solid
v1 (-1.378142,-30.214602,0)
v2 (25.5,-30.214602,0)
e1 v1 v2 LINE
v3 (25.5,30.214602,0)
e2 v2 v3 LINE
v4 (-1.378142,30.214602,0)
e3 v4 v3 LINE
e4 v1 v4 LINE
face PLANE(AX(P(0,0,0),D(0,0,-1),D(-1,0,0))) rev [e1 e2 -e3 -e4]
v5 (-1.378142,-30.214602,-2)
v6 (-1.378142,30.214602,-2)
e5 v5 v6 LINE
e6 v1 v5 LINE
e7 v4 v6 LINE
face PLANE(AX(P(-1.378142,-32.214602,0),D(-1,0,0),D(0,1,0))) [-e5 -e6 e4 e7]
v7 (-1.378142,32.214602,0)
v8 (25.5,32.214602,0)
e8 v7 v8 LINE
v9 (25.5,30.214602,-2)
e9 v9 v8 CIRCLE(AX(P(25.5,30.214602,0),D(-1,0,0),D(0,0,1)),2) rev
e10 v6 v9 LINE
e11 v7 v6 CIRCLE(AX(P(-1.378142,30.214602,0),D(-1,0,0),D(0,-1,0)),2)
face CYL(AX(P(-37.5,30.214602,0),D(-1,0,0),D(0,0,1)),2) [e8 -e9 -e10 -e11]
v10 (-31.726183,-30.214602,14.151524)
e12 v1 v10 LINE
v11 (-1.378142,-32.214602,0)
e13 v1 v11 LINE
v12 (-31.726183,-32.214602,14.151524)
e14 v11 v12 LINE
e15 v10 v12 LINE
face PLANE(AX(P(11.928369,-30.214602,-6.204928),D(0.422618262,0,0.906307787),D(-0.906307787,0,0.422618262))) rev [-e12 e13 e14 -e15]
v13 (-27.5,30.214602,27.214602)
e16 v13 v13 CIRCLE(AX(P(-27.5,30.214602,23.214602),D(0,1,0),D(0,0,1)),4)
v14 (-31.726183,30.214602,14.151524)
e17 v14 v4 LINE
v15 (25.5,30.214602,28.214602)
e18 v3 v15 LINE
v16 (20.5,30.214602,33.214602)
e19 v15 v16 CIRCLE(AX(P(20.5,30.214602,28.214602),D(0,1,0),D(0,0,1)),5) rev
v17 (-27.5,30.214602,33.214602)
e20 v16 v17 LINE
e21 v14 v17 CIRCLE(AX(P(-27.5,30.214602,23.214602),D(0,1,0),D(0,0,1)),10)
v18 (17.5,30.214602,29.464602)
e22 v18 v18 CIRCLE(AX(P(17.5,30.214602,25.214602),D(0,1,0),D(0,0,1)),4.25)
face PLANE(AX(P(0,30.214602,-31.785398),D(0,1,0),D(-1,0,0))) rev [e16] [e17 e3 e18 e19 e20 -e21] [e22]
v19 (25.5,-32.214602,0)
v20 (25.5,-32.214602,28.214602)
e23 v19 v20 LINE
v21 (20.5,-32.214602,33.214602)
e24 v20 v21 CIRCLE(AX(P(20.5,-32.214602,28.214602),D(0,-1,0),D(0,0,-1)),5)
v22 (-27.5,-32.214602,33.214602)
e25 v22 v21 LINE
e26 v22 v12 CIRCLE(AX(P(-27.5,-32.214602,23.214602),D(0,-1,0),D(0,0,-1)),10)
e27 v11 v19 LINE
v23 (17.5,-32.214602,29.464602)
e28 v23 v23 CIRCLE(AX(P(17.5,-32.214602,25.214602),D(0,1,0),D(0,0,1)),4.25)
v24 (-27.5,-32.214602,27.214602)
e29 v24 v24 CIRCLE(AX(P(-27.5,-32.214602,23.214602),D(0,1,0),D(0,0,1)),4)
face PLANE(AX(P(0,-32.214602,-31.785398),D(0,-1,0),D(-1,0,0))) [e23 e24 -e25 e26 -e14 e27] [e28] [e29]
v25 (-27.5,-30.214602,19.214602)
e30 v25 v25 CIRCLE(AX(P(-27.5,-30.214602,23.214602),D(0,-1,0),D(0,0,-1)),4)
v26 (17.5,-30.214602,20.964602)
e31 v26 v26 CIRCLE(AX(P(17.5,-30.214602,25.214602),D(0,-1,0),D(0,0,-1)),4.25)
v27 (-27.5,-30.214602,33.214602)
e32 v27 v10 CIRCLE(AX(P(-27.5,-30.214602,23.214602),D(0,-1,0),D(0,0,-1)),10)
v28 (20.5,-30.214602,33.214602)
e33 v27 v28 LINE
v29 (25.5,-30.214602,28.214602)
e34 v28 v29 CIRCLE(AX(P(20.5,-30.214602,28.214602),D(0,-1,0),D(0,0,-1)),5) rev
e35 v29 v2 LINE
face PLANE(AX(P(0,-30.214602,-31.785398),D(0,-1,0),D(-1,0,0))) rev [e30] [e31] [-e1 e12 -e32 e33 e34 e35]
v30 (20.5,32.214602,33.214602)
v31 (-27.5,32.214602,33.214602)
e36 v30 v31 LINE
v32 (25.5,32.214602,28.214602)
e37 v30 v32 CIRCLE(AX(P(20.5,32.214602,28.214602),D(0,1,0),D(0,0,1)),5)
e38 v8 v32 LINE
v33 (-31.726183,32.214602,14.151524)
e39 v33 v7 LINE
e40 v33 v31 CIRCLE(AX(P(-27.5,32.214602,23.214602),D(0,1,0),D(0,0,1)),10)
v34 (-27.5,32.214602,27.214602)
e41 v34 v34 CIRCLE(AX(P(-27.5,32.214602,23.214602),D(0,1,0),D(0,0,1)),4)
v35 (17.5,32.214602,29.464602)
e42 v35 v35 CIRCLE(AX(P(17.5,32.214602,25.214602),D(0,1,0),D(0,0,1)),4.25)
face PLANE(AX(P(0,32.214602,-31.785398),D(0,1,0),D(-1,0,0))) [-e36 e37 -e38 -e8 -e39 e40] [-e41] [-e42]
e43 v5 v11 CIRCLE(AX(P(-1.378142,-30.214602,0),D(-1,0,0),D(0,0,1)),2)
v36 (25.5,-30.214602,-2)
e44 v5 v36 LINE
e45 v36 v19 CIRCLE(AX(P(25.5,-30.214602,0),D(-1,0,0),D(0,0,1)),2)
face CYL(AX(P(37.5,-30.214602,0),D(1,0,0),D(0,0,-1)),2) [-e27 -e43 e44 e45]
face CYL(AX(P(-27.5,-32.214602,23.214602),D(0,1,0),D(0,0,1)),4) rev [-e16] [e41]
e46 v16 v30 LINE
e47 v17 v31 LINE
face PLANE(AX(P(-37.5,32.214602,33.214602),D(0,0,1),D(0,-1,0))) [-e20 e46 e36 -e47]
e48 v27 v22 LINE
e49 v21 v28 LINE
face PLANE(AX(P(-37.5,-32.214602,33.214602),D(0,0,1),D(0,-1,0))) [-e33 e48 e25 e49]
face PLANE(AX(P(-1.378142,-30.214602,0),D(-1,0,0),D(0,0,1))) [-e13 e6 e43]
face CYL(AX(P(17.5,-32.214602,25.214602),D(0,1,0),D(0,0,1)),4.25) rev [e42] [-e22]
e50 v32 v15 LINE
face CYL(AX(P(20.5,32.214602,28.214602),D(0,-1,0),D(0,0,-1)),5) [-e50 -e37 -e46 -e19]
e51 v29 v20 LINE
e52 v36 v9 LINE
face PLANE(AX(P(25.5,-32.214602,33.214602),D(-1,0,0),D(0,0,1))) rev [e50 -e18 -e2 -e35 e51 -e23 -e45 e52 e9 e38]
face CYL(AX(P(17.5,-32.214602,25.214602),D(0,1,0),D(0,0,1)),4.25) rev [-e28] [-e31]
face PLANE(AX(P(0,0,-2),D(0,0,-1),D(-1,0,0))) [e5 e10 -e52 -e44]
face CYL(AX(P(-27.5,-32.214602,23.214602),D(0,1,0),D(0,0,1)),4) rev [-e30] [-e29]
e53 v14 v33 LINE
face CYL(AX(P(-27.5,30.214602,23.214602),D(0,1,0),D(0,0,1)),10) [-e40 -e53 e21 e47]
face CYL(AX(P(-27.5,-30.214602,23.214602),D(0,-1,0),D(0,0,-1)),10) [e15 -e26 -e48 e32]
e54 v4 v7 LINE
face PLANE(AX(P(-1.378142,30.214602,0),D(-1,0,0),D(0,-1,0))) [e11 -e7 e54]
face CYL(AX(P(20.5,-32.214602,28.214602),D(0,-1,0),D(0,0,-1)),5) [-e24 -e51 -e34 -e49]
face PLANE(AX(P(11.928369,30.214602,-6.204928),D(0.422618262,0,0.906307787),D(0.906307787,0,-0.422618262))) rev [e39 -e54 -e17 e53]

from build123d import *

# Parameters (mm, degrees)
SKETCH1_W                  = 75
SKETCH1_H                  = 130
BASE_FLANGE1_DEPTH         = 2
SKETCHED_START             = -37.5
SKETCHED_BEND1_DEPTH       = 75
SKETCHED_BEND1_2_OUTLINE_W = 2
SKETCHED_BEND1_2_OUTLINE_H = 33.214601837
SKETCHED_BEND1_2_DEPTH     = 75
CUT_EXTRUDE1_START         = -64.429203673
CUT_EXTRUDE1_DEPTH         = 64.429203673
CUT_EXTRUDE2_DEPTH         = 82.61238914
CUT_EXTRUDE2_DEPTH_BACK    = 82.61238914
SKETCH9_R                  = 4
CUT_EXTRUDE3_DEPTH         = 82.61238914
CUT_EXTRUDE3_DEPTH_BACK    = 82.61238914
SKETCH10_R                 = 4.25
SKETCH10_W                 = 12
SKETCH10_H                 = 100
FILLET7_R                  = 5


# Read off the part's stored shape, not the designer's step: Sketched Bend1, Cut-Extrude1
# Sheet-metal steps are written as plain solids
with BuildPart() as part:
    # Sketch1 → Base-Flange1 (new body)
    with BuildSketch(Plane.XY):
        Rectangle(SKETCH1_W, SKETCH1_H)
    extrude(amount=-BASE_FLANGE1_DEPTH)

    # Sketched Bend1 outline → Sketched Bend1 (cut)
    with BuildSketch(Plane.YZ.offset(SKETCHED_START)):
        with BuildLine():
            Line((65, 0), (32.214601837, 0))
            ThreePointArc((32.214601837, 0), (31.628815399, -1.414213562), (30.214601837, -2))
            Line((30.214601837, -2), (65, -2))
            Line((65, -2), (65, 0))
        make_face()
        with BuildLine():
            Line((-65, -2), (-30.214601837, -2))
            ThreePointArc((-30.214601837, -2), (-31.628815399, -1.414213562), (-32.214601837, 0))
            Line((-32.214601837, 0), (-65, 0))
            Line((-65, 0), (-65, -2))
        make_face()
    extrude(amount=SKETCHED_BEND1_DEPTH, mode=Mode.SUBTRACT)

    # Sketched Bend1 2 outline → Sketched Bend1 2 (add)
    with BuildSketch(Plane.YZ.offset(SKETCHED_START)):
        with Locations((31.214601837, 16.607300919)):
            Rectangle(SKETCHED_BEND1_2_OUTLINE_W, SKETCHED_BEND1_2_OUTLINE_H)
        with Locations((-31.214601837, 16.607300919)):
            Rectangle(SKETCHED_BEND1_2_OUTLINE_W, SKETCHED_BEND1_2_OUTLINE_H)
    extrude(amount=SKETCHED_BEND1_2_DEPTH)

    # Cut-Extrude1 outline → Cut-Extrude1 (cut)
    with BuildSketch(Plane(origin=(0, 32.214601837, 0), x_dir=(1, 0, 0), z_dir=(0, 1, 0)).offset(CUT_EXTRUDE1_START)):
        with BuildLine():
            Line((-37.5, -33.214601837), (-27.5, -33.214601837))
            ThreePointArc((-27.5, -33.214601837), (-34.571067812, -30.285669649), (-37.5, -23.214601837))
            Line((-37.5, -23.214601837), (-37.5, -33.214601837))
        make_face()
        with BuildLine():
            ThreePointArc((-37.5, -23.214601837), (-35.933914458, -17.841605753), (-31.726182617, -14.151523966))
            Line((-31.726182617, -14.151523966), (-1.378141536, 0))
            Line((-1.378141536, 0), (-1.378141536, 2))
            Line((-1.378141536, 2), (-37.5, 2))
            Line((-37.5, 2), (-37.5, -23.214601837))
        make_face()
    extrude(amount=CUT_EXTRUDE1_DEPTH, mode=Mode.SUBTRACT)

    # Sketch9 → Cut-Extrude2 (cut, two sides: drawn at the far end of the back side and taken through both)
    with BuildSketch(Plane(origin=(0, 32.214601837, 0), x_dir=(1, 0, 0), z_dir=(0, 1, 0)).offset(-CUT_EXTRUDE2_DEPTH_BACK)):
        with Locations(Location((-27.5, -23.214601837, 0), (0, 0, 270))):
            Circle(SKETCH9_R)
    extrude(amount=CUT_EXTRUDE2_DEPTH + CUT_EXTRUDE2_DEPTH_BACK, mode=Mode.SUBTRACT)

    # Sketch10 → Cut-Extrude3 (cut, two sides: drawn at the far end of the back side and taken through both)
    with BuildSketch(Plane(origin=(0, 32.214601837, 0), x_dir=(1, 0, 0), z_dir=(0, 1, 0)).offset(-CUT_EXTRUDE3_DEPTH_BACK)):
        with Locations(Location((17.5, -25.214601837, 0), (0, 0, 270))):
            Circle(SKETCH10_R)
        with Locations((31.5, 16.785398163)):
            Rectangle(SKETCH10_W, SKETCH10_H)
    extrude(amount=CUT_EXTRUDE3_DEPTH + CUT_EXTRUDE3_DEPTH_BACK, mode=Mode.SUBTRACT)

    # Fillet7
    fillet7_edges = [part.edges().sort_by_distance(p)[0] for p in [
        (25.5, 31.214601837, 33.214601837),
        (25.5, -31.214601837, 33.214601837),
    ]]
    fillet(fillet7_edges, radius=FILLET7_R)


solid = part.part
